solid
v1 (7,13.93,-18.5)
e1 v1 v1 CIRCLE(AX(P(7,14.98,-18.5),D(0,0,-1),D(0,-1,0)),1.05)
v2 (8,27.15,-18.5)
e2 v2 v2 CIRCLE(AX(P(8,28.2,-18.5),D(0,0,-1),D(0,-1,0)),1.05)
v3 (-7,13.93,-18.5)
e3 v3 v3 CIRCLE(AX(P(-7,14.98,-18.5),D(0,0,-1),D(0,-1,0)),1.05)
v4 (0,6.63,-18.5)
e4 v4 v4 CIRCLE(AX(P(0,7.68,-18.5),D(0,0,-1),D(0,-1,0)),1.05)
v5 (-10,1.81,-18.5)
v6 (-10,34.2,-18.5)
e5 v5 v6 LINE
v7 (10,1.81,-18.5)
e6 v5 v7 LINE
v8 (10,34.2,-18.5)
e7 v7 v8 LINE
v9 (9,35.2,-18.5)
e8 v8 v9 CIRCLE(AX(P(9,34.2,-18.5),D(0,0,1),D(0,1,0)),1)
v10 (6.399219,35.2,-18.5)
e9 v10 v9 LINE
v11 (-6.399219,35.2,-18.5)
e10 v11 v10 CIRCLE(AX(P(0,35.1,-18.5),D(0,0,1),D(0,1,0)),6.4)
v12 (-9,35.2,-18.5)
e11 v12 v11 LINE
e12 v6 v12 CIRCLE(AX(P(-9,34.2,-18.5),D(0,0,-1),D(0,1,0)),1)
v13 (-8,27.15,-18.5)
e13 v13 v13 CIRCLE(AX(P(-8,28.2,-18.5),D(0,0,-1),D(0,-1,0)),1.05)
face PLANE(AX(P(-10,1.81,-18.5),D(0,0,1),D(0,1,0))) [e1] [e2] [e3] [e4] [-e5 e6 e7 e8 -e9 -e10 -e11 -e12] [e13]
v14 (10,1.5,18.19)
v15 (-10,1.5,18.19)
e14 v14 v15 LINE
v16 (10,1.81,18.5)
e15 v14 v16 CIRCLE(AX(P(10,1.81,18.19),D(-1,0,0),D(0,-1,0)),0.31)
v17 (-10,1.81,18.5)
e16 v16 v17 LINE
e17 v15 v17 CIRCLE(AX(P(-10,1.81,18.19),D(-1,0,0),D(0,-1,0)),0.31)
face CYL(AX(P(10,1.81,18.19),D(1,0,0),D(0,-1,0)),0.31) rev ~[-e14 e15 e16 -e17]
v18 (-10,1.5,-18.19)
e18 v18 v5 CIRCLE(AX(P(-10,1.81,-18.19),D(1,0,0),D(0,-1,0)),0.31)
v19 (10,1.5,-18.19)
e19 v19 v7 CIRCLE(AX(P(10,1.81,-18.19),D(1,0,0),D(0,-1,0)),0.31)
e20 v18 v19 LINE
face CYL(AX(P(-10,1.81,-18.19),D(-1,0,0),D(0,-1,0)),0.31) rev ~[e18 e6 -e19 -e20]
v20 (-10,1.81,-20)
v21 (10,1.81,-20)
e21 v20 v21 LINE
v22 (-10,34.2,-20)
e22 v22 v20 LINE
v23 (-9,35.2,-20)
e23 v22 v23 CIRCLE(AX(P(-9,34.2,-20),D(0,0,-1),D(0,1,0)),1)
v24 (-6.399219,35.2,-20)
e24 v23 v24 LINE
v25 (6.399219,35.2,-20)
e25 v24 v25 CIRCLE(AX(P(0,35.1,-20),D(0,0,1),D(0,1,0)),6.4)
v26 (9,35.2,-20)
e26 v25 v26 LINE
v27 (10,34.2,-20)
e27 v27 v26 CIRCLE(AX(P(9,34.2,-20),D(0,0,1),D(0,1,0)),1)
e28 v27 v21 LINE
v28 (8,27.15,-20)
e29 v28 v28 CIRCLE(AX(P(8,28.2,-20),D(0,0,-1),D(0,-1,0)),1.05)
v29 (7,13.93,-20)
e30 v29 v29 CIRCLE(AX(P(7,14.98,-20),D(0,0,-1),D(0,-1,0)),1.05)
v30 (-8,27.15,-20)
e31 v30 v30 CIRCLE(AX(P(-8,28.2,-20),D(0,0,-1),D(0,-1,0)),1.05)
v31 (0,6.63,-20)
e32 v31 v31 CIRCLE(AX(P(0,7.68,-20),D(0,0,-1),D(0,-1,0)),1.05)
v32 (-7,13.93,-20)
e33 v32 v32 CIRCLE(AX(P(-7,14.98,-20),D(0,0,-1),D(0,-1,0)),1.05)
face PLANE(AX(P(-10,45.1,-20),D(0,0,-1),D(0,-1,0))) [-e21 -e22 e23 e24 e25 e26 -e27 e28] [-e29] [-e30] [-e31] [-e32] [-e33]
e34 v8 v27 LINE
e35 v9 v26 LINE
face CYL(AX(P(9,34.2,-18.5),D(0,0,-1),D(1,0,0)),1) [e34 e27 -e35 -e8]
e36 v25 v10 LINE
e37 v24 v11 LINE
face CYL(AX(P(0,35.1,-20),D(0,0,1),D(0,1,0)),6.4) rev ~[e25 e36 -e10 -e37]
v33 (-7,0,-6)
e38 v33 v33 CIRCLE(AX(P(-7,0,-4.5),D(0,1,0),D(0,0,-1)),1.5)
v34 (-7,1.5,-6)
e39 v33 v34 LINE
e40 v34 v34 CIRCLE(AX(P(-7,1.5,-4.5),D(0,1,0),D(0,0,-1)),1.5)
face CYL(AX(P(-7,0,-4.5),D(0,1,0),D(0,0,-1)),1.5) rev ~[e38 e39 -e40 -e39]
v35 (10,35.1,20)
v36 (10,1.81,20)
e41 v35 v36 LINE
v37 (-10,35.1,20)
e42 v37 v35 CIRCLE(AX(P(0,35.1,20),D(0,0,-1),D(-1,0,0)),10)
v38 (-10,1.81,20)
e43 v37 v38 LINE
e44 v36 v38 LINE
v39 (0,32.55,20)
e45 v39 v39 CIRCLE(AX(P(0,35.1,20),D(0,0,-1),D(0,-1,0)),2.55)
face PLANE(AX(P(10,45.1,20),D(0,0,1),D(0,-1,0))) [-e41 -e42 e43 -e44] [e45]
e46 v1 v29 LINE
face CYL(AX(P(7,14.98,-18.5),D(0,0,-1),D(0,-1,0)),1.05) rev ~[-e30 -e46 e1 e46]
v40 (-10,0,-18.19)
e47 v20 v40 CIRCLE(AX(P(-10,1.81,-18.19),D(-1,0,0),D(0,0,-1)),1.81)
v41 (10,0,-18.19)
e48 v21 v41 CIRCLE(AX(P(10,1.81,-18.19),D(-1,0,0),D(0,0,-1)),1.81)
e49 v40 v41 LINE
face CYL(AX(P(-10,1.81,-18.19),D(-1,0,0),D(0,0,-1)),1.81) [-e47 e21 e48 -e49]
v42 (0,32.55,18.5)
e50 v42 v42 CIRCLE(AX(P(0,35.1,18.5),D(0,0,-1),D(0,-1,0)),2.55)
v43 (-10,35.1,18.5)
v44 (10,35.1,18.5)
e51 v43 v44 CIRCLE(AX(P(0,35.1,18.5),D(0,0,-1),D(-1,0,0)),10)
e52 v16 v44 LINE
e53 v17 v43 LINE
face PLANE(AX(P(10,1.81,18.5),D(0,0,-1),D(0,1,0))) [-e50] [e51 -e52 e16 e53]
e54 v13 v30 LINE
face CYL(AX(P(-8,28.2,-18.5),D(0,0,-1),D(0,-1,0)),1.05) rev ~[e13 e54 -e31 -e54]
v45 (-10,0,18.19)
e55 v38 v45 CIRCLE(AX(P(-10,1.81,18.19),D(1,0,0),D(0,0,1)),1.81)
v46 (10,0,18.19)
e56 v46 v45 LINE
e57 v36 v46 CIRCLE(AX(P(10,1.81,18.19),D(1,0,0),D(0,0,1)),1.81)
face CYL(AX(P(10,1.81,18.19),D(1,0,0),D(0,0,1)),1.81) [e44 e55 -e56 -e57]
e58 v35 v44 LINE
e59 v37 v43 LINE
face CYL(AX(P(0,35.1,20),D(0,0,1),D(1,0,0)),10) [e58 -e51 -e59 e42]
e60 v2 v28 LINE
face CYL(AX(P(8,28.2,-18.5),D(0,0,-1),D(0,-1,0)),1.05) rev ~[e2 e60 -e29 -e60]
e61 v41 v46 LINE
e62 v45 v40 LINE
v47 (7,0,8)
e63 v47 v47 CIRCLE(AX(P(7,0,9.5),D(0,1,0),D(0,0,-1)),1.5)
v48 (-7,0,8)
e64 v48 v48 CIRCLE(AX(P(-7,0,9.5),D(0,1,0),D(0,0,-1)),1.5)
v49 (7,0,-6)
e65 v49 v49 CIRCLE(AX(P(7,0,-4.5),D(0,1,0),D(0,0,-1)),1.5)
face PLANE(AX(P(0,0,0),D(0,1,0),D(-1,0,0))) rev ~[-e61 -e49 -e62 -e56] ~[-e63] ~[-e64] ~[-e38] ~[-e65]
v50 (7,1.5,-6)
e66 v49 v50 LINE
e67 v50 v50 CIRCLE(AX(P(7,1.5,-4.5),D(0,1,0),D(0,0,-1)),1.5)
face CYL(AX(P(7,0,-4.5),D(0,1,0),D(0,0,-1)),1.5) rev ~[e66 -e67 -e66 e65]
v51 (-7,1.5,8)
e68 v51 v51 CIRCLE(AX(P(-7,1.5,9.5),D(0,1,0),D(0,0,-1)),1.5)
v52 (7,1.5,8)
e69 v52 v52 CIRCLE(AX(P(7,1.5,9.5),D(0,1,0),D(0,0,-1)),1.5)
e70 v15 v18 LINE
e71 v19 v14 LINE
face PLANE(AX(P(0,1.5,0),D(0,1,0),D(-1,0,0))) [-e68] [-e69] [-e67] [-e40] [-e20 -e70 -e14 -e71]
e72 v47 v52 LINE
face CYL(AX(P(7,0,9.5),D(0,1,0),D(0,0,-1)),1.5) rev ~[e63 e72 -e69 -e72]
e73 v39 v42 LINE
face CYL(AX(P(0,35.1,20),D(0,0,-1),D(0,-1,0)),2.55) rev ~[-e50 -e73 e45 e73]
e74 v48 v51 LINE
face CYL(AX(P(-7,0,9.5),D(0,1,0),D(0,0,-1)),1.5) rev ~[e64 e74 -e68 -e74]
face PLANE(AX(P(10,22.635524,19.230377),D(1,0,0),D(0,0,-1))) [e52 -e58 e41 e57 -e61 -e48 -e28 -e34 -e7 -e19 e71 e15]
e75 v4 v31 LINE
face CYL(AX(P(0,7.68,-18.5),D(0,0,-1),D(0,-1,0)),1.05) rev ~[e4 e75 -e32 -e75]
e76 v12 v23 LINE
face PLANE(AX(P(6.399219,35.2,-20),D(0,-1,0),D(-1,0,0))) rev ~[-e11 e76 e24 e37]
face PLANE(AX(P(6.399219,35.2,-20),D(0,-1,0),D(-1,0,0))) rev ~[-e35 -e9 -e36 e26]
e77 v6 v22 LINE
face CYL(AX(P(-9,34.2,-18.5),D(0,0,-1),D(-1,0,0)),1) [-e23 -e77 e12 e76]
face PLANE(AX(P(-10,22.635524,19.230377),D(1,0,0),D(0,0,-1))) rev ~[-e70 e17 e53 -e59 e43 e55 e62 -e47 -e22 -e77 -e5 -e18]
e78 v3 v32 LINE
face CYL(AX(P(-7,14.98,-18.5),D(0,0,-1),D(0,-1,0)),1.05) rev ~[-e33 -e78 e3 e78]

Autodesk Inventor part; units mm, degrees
ref_plane "YZ Plane" through (0, 0, 0) normal (1, 0, 0) x (0, 1, 0)
ref_plane "XZ Plane" through (0, 0, 0) normal (0, 1, 0) x (-1, 0, 0)
ref_plane "XY Plane" through (0, 0, 0) normal (0, 0, 1) x (1, 0, 0)
sketch "Sketch1" plane through (0, 0, 0) normal (0, 1, 0) x (-1, 0, 0)
  line L0 (10, -18.5) -> (-10, -18.5)
  line L1 (-10, -18.5) -> (-10, 18.5)
  line L2 (-10, 18.5) -> (10, 18.5)
  line L3 (10, 18.5) -> (10, -18.5)
  point P0 (0, 0)
  dimension "d0" = 20
  dimension "d1" = 37
  dimension "d2" = 18.5
  dimension "d3" = 10
extrude "Plate1" add sketch "Sketch1" along normal blind 1.5
sketch "Sketch2" plane through (-10, 0, -20) normal (0, 0, 1) x (1, 0, 0)
  line L0 (20, 0) -> (0, 0)
  line L1 (0, 0) -> (0, 45.1)
  line L2 (0, 45.1) -> (20, 45.1)
  line L3 (20, 45.1) -> (20, 0)
edge flange "Flange1" height 45.1 angle 90 thickness 1.5 bend radius 0.31 thickness toward (0, 0, 1) relief tear relief width 1.5 relief depth 0.75 edges at (0, 1.5, -18.5) wall of the first edge with corners at (10, 0, -20) (-10, 0, -20) (-10, 45.1, -20) (10, 45.1, -20)
bend "Bend1"
corner "Corner1"
sketch "Sketch3" plane through (10, 0, 20) normal (0, 0, -1) x (-1, 0, 0)
  line L0 (20, 0) -> (0, 0)
  line L1 (0, 0) -> (0, 45.1)
  line L2 (0, 45.1) -> (20, 45.1)
  line L3 (20, 45.1) -> (20, 0)
edge flange "Flange2" height 45.1 angle 90 thickness 1.5 bend radius 0.31 thickness toward (0, 0, -1) relief tear relief width 1.5 relief depth 0.75 edges at (0, 1.5, 18.5) wall of the first edge with corners at (-10, 0, 20) (10, 0, 20) (10, 45.1, 20) (-10, 45.1, 20)
bend "Bend2"
corner "Corner2"
sketch "Sketch4" plane through (-10, 45.1, 20) normal (0, 0, 1) x (1, 0, 0)
  circle A0 centre (10, -10) radius 10
  line L0 (0, 0) -> (20, 0) projected
  line L1 (0, 0) -> (20, 0)
  line L2 (20, 0) -> (20, -10)
  line L3 (20, -10) -> (0, -10)
  line L4 (0, -10) -> (0, 0)
  line L5 (0, -43.29) -> (0, 0) projected
  point P0 (10, -45.1)
  point P1 (10, -10)
  point P2 (20, 0)
  point P3 (10, 0)
  point P4 (0, -10)
  point P5 (8.5893, 0)
  point P6 (0, -10)
  dimension "d26" = 20
  dimension "d25" = 10
  dimension "d27" = 10
  dimension "d28" = 10
extrude "Extrusion1" cut sketch "Sketch4" against normal blind 10 contours L4 L0 A0 | A0 L0 L2
sketch "Sketch5" plane through (10, 45.1, -20) normal (0, 0, -1) x (-1, 0, 0)
  arc A0 (20, -10) -> (0, -10) centre (10, -10) ccw projected
  point P0 (10, -45.1)
hole "Hole1" at (0, 35.1, -20) direction (0, 0, 1) diameter 12.8 depth 1.5
sketch "Sketch6" plane through (10, 45.1, -20) normal (0, 0, -1) x (-1, 0, 0)
  circle A0 centre (10, -10) radius 6.4 projected
  line L0 (0, 0) -> (20, 0) projected
  line L1 (0, -43.29) -> (0, 0) projected
  line L2 (24, 0) -> (-4, 0)
  line L3 (-4, 0) -> (-4, -9.9)
  line L4 (-4, -9.9) -> (24, -9.9)
  line L5 (24, -9.9) -> (24, 0)
  point P0 (10, -45.1)
  point P1 (20, 0)
  point P2 (6.005, 0)
  point P3 (13.995, 0)
  dimension "d38" = 9.9
  dimension "d39" = 4
  dimension "d40" = 28
extrude "Extrusion2" cut sketch "Sketch6" against normal blind 10 contours L4 A0 | A0 L4 L1 L0 L2 L5 | L4 L3 L2 L1 picked at (9.1972, -6.4205)
fillet "Fillet1" radius 1 2 edges at (-10, 35.2, -19.25) (10, 35.2, -19.25)
sketch "Sketch7" plane through (-10, 1.81, 20) normal (0, 0, 1) x (1, 0, 0)
  arc A0 (20, 33.29) -> (0, 33.29) centre (10, 33.29) ccw projected
  point P0 (10, -1.81)
hole "Hole2" at (0, 35.1, 20) direction (0, 0, -1) diameter 5.1 depth 1.5 clearance for "Hex Head Bolt" size "M5" standard "Ansi Metric M Profile"
sketch "Sketch8" plane through (0, 0, 0) normal (0, -1, 0) x (1, 0, 0)
  line L0 (2.55, 18.5) -> (-2.55, 18.5) projected
  line L1 (-10, 18.5) -> (10, 18.5) projected
  line L2 (10, 18.5) -> (-10, 18.5) projected
  line L3 (10, 18.19) -> (-10, 18.19) projected
  line L4 (-10, -18.19) -> (-10, 18.19) projected
  line L5 (-10, -18.19) -> (10, -18.19) projected
  line L6 (10, 18.19) -> (10, -18.19) projected
  point P0 (0, 0)
  point P1 (7, 9.5)
  point P2 (7, -4.5)
  point P3 (-7, 9.5)
  point P4 (-7, -4.5)
  dimension "d51" = 9
  dimension "d52" = 3
  dimension "d55" = 14
  dimension "d58" = 14
hole "Hole3" at (7, 0, 9.5) at (7, 0, -4.5) at (-7, 0, 9.5) at (-7, 0, -4.5) direction (0, 1, 0) diameter 3 depth 1.5
sketch "Sketch11" plane through (-10, 1.81, -18.5) normal (0, 0, 1) x (1, 0, 0)
  circle A0 centre (18, 26.39) radius 0.7835
  circle A1 centre (2, 26.39) radius 0.7835
  circle A2 centre (17, 13.17) radius 0.7835
  circle A3 centre (3, 13.17) radius 0.7835
  circle A4 centre (10, 5.87) radius 0.7835
  point P0 (10, -1.81)
hole "Hole6" at (-8, 28.2, -18.5) at (-7, 14.98, -18.5) at (0, 7.68, -18.5) at (7, 14.98, -18.5) at (8, 28.2, -18.5) direction (0, 0, -1) diameter 2.1 depth 1.5
equation "\"d36\" = Thickness"
equation "\"d49\" = Thickness"
equation "\"d66\" = Thickness"
equation "\"d87\" = Thickness"
equation "\"d4\" = Thickness"
equation "\"d5\" = BendReliefWidth"
equation "\"d6\" = BendReliefDepth"
equation "\"d7\" = MinimumRemnant"
equation "\"d8\" = TransitionRadius"
equation "\"d11\" = BendRadius"
equation "\"d12\" = CornerReliefSize"
equation "\"d13\" = GapSize"
equation "\"d14\" = JacobiRadiusSize"
equation "\"d15\" = BendReliefWidth"
equation "\"d16\" = BendReliefDepth"
equation "\"d17\" = MinimumRemnant"
equation "\"d18\" = TransitionRadius"
equation "\"d21\" = BendRadius"
equation "\"d22\" = CornerReliefSize"
equation "\"d23\" = GapSize"
equation "\"d24\" = JacobiRadiusSize"
equation "\"BendReliefWidth\" = Thickness"
equation "\"BendReliefDepth\" = 0.5 * Thickness"
equation "\"CornerReliefSize\" = 4 * Thickness"
equation "\"MinimumRemnant\" = 2 * Thickness"
equation "\"TransitionRadius\" = BendRadius"
equation "\"JacobiRadiusSize\" = BendRadius"
equation "\"GapSize\" = Thickness"
equation "\"Thickness\" = 1.5"
equation "\"BendRadius\" = 0.31"
properties part number "axis_9_bottom_frame" material "Aluminum 6061-AHC"
